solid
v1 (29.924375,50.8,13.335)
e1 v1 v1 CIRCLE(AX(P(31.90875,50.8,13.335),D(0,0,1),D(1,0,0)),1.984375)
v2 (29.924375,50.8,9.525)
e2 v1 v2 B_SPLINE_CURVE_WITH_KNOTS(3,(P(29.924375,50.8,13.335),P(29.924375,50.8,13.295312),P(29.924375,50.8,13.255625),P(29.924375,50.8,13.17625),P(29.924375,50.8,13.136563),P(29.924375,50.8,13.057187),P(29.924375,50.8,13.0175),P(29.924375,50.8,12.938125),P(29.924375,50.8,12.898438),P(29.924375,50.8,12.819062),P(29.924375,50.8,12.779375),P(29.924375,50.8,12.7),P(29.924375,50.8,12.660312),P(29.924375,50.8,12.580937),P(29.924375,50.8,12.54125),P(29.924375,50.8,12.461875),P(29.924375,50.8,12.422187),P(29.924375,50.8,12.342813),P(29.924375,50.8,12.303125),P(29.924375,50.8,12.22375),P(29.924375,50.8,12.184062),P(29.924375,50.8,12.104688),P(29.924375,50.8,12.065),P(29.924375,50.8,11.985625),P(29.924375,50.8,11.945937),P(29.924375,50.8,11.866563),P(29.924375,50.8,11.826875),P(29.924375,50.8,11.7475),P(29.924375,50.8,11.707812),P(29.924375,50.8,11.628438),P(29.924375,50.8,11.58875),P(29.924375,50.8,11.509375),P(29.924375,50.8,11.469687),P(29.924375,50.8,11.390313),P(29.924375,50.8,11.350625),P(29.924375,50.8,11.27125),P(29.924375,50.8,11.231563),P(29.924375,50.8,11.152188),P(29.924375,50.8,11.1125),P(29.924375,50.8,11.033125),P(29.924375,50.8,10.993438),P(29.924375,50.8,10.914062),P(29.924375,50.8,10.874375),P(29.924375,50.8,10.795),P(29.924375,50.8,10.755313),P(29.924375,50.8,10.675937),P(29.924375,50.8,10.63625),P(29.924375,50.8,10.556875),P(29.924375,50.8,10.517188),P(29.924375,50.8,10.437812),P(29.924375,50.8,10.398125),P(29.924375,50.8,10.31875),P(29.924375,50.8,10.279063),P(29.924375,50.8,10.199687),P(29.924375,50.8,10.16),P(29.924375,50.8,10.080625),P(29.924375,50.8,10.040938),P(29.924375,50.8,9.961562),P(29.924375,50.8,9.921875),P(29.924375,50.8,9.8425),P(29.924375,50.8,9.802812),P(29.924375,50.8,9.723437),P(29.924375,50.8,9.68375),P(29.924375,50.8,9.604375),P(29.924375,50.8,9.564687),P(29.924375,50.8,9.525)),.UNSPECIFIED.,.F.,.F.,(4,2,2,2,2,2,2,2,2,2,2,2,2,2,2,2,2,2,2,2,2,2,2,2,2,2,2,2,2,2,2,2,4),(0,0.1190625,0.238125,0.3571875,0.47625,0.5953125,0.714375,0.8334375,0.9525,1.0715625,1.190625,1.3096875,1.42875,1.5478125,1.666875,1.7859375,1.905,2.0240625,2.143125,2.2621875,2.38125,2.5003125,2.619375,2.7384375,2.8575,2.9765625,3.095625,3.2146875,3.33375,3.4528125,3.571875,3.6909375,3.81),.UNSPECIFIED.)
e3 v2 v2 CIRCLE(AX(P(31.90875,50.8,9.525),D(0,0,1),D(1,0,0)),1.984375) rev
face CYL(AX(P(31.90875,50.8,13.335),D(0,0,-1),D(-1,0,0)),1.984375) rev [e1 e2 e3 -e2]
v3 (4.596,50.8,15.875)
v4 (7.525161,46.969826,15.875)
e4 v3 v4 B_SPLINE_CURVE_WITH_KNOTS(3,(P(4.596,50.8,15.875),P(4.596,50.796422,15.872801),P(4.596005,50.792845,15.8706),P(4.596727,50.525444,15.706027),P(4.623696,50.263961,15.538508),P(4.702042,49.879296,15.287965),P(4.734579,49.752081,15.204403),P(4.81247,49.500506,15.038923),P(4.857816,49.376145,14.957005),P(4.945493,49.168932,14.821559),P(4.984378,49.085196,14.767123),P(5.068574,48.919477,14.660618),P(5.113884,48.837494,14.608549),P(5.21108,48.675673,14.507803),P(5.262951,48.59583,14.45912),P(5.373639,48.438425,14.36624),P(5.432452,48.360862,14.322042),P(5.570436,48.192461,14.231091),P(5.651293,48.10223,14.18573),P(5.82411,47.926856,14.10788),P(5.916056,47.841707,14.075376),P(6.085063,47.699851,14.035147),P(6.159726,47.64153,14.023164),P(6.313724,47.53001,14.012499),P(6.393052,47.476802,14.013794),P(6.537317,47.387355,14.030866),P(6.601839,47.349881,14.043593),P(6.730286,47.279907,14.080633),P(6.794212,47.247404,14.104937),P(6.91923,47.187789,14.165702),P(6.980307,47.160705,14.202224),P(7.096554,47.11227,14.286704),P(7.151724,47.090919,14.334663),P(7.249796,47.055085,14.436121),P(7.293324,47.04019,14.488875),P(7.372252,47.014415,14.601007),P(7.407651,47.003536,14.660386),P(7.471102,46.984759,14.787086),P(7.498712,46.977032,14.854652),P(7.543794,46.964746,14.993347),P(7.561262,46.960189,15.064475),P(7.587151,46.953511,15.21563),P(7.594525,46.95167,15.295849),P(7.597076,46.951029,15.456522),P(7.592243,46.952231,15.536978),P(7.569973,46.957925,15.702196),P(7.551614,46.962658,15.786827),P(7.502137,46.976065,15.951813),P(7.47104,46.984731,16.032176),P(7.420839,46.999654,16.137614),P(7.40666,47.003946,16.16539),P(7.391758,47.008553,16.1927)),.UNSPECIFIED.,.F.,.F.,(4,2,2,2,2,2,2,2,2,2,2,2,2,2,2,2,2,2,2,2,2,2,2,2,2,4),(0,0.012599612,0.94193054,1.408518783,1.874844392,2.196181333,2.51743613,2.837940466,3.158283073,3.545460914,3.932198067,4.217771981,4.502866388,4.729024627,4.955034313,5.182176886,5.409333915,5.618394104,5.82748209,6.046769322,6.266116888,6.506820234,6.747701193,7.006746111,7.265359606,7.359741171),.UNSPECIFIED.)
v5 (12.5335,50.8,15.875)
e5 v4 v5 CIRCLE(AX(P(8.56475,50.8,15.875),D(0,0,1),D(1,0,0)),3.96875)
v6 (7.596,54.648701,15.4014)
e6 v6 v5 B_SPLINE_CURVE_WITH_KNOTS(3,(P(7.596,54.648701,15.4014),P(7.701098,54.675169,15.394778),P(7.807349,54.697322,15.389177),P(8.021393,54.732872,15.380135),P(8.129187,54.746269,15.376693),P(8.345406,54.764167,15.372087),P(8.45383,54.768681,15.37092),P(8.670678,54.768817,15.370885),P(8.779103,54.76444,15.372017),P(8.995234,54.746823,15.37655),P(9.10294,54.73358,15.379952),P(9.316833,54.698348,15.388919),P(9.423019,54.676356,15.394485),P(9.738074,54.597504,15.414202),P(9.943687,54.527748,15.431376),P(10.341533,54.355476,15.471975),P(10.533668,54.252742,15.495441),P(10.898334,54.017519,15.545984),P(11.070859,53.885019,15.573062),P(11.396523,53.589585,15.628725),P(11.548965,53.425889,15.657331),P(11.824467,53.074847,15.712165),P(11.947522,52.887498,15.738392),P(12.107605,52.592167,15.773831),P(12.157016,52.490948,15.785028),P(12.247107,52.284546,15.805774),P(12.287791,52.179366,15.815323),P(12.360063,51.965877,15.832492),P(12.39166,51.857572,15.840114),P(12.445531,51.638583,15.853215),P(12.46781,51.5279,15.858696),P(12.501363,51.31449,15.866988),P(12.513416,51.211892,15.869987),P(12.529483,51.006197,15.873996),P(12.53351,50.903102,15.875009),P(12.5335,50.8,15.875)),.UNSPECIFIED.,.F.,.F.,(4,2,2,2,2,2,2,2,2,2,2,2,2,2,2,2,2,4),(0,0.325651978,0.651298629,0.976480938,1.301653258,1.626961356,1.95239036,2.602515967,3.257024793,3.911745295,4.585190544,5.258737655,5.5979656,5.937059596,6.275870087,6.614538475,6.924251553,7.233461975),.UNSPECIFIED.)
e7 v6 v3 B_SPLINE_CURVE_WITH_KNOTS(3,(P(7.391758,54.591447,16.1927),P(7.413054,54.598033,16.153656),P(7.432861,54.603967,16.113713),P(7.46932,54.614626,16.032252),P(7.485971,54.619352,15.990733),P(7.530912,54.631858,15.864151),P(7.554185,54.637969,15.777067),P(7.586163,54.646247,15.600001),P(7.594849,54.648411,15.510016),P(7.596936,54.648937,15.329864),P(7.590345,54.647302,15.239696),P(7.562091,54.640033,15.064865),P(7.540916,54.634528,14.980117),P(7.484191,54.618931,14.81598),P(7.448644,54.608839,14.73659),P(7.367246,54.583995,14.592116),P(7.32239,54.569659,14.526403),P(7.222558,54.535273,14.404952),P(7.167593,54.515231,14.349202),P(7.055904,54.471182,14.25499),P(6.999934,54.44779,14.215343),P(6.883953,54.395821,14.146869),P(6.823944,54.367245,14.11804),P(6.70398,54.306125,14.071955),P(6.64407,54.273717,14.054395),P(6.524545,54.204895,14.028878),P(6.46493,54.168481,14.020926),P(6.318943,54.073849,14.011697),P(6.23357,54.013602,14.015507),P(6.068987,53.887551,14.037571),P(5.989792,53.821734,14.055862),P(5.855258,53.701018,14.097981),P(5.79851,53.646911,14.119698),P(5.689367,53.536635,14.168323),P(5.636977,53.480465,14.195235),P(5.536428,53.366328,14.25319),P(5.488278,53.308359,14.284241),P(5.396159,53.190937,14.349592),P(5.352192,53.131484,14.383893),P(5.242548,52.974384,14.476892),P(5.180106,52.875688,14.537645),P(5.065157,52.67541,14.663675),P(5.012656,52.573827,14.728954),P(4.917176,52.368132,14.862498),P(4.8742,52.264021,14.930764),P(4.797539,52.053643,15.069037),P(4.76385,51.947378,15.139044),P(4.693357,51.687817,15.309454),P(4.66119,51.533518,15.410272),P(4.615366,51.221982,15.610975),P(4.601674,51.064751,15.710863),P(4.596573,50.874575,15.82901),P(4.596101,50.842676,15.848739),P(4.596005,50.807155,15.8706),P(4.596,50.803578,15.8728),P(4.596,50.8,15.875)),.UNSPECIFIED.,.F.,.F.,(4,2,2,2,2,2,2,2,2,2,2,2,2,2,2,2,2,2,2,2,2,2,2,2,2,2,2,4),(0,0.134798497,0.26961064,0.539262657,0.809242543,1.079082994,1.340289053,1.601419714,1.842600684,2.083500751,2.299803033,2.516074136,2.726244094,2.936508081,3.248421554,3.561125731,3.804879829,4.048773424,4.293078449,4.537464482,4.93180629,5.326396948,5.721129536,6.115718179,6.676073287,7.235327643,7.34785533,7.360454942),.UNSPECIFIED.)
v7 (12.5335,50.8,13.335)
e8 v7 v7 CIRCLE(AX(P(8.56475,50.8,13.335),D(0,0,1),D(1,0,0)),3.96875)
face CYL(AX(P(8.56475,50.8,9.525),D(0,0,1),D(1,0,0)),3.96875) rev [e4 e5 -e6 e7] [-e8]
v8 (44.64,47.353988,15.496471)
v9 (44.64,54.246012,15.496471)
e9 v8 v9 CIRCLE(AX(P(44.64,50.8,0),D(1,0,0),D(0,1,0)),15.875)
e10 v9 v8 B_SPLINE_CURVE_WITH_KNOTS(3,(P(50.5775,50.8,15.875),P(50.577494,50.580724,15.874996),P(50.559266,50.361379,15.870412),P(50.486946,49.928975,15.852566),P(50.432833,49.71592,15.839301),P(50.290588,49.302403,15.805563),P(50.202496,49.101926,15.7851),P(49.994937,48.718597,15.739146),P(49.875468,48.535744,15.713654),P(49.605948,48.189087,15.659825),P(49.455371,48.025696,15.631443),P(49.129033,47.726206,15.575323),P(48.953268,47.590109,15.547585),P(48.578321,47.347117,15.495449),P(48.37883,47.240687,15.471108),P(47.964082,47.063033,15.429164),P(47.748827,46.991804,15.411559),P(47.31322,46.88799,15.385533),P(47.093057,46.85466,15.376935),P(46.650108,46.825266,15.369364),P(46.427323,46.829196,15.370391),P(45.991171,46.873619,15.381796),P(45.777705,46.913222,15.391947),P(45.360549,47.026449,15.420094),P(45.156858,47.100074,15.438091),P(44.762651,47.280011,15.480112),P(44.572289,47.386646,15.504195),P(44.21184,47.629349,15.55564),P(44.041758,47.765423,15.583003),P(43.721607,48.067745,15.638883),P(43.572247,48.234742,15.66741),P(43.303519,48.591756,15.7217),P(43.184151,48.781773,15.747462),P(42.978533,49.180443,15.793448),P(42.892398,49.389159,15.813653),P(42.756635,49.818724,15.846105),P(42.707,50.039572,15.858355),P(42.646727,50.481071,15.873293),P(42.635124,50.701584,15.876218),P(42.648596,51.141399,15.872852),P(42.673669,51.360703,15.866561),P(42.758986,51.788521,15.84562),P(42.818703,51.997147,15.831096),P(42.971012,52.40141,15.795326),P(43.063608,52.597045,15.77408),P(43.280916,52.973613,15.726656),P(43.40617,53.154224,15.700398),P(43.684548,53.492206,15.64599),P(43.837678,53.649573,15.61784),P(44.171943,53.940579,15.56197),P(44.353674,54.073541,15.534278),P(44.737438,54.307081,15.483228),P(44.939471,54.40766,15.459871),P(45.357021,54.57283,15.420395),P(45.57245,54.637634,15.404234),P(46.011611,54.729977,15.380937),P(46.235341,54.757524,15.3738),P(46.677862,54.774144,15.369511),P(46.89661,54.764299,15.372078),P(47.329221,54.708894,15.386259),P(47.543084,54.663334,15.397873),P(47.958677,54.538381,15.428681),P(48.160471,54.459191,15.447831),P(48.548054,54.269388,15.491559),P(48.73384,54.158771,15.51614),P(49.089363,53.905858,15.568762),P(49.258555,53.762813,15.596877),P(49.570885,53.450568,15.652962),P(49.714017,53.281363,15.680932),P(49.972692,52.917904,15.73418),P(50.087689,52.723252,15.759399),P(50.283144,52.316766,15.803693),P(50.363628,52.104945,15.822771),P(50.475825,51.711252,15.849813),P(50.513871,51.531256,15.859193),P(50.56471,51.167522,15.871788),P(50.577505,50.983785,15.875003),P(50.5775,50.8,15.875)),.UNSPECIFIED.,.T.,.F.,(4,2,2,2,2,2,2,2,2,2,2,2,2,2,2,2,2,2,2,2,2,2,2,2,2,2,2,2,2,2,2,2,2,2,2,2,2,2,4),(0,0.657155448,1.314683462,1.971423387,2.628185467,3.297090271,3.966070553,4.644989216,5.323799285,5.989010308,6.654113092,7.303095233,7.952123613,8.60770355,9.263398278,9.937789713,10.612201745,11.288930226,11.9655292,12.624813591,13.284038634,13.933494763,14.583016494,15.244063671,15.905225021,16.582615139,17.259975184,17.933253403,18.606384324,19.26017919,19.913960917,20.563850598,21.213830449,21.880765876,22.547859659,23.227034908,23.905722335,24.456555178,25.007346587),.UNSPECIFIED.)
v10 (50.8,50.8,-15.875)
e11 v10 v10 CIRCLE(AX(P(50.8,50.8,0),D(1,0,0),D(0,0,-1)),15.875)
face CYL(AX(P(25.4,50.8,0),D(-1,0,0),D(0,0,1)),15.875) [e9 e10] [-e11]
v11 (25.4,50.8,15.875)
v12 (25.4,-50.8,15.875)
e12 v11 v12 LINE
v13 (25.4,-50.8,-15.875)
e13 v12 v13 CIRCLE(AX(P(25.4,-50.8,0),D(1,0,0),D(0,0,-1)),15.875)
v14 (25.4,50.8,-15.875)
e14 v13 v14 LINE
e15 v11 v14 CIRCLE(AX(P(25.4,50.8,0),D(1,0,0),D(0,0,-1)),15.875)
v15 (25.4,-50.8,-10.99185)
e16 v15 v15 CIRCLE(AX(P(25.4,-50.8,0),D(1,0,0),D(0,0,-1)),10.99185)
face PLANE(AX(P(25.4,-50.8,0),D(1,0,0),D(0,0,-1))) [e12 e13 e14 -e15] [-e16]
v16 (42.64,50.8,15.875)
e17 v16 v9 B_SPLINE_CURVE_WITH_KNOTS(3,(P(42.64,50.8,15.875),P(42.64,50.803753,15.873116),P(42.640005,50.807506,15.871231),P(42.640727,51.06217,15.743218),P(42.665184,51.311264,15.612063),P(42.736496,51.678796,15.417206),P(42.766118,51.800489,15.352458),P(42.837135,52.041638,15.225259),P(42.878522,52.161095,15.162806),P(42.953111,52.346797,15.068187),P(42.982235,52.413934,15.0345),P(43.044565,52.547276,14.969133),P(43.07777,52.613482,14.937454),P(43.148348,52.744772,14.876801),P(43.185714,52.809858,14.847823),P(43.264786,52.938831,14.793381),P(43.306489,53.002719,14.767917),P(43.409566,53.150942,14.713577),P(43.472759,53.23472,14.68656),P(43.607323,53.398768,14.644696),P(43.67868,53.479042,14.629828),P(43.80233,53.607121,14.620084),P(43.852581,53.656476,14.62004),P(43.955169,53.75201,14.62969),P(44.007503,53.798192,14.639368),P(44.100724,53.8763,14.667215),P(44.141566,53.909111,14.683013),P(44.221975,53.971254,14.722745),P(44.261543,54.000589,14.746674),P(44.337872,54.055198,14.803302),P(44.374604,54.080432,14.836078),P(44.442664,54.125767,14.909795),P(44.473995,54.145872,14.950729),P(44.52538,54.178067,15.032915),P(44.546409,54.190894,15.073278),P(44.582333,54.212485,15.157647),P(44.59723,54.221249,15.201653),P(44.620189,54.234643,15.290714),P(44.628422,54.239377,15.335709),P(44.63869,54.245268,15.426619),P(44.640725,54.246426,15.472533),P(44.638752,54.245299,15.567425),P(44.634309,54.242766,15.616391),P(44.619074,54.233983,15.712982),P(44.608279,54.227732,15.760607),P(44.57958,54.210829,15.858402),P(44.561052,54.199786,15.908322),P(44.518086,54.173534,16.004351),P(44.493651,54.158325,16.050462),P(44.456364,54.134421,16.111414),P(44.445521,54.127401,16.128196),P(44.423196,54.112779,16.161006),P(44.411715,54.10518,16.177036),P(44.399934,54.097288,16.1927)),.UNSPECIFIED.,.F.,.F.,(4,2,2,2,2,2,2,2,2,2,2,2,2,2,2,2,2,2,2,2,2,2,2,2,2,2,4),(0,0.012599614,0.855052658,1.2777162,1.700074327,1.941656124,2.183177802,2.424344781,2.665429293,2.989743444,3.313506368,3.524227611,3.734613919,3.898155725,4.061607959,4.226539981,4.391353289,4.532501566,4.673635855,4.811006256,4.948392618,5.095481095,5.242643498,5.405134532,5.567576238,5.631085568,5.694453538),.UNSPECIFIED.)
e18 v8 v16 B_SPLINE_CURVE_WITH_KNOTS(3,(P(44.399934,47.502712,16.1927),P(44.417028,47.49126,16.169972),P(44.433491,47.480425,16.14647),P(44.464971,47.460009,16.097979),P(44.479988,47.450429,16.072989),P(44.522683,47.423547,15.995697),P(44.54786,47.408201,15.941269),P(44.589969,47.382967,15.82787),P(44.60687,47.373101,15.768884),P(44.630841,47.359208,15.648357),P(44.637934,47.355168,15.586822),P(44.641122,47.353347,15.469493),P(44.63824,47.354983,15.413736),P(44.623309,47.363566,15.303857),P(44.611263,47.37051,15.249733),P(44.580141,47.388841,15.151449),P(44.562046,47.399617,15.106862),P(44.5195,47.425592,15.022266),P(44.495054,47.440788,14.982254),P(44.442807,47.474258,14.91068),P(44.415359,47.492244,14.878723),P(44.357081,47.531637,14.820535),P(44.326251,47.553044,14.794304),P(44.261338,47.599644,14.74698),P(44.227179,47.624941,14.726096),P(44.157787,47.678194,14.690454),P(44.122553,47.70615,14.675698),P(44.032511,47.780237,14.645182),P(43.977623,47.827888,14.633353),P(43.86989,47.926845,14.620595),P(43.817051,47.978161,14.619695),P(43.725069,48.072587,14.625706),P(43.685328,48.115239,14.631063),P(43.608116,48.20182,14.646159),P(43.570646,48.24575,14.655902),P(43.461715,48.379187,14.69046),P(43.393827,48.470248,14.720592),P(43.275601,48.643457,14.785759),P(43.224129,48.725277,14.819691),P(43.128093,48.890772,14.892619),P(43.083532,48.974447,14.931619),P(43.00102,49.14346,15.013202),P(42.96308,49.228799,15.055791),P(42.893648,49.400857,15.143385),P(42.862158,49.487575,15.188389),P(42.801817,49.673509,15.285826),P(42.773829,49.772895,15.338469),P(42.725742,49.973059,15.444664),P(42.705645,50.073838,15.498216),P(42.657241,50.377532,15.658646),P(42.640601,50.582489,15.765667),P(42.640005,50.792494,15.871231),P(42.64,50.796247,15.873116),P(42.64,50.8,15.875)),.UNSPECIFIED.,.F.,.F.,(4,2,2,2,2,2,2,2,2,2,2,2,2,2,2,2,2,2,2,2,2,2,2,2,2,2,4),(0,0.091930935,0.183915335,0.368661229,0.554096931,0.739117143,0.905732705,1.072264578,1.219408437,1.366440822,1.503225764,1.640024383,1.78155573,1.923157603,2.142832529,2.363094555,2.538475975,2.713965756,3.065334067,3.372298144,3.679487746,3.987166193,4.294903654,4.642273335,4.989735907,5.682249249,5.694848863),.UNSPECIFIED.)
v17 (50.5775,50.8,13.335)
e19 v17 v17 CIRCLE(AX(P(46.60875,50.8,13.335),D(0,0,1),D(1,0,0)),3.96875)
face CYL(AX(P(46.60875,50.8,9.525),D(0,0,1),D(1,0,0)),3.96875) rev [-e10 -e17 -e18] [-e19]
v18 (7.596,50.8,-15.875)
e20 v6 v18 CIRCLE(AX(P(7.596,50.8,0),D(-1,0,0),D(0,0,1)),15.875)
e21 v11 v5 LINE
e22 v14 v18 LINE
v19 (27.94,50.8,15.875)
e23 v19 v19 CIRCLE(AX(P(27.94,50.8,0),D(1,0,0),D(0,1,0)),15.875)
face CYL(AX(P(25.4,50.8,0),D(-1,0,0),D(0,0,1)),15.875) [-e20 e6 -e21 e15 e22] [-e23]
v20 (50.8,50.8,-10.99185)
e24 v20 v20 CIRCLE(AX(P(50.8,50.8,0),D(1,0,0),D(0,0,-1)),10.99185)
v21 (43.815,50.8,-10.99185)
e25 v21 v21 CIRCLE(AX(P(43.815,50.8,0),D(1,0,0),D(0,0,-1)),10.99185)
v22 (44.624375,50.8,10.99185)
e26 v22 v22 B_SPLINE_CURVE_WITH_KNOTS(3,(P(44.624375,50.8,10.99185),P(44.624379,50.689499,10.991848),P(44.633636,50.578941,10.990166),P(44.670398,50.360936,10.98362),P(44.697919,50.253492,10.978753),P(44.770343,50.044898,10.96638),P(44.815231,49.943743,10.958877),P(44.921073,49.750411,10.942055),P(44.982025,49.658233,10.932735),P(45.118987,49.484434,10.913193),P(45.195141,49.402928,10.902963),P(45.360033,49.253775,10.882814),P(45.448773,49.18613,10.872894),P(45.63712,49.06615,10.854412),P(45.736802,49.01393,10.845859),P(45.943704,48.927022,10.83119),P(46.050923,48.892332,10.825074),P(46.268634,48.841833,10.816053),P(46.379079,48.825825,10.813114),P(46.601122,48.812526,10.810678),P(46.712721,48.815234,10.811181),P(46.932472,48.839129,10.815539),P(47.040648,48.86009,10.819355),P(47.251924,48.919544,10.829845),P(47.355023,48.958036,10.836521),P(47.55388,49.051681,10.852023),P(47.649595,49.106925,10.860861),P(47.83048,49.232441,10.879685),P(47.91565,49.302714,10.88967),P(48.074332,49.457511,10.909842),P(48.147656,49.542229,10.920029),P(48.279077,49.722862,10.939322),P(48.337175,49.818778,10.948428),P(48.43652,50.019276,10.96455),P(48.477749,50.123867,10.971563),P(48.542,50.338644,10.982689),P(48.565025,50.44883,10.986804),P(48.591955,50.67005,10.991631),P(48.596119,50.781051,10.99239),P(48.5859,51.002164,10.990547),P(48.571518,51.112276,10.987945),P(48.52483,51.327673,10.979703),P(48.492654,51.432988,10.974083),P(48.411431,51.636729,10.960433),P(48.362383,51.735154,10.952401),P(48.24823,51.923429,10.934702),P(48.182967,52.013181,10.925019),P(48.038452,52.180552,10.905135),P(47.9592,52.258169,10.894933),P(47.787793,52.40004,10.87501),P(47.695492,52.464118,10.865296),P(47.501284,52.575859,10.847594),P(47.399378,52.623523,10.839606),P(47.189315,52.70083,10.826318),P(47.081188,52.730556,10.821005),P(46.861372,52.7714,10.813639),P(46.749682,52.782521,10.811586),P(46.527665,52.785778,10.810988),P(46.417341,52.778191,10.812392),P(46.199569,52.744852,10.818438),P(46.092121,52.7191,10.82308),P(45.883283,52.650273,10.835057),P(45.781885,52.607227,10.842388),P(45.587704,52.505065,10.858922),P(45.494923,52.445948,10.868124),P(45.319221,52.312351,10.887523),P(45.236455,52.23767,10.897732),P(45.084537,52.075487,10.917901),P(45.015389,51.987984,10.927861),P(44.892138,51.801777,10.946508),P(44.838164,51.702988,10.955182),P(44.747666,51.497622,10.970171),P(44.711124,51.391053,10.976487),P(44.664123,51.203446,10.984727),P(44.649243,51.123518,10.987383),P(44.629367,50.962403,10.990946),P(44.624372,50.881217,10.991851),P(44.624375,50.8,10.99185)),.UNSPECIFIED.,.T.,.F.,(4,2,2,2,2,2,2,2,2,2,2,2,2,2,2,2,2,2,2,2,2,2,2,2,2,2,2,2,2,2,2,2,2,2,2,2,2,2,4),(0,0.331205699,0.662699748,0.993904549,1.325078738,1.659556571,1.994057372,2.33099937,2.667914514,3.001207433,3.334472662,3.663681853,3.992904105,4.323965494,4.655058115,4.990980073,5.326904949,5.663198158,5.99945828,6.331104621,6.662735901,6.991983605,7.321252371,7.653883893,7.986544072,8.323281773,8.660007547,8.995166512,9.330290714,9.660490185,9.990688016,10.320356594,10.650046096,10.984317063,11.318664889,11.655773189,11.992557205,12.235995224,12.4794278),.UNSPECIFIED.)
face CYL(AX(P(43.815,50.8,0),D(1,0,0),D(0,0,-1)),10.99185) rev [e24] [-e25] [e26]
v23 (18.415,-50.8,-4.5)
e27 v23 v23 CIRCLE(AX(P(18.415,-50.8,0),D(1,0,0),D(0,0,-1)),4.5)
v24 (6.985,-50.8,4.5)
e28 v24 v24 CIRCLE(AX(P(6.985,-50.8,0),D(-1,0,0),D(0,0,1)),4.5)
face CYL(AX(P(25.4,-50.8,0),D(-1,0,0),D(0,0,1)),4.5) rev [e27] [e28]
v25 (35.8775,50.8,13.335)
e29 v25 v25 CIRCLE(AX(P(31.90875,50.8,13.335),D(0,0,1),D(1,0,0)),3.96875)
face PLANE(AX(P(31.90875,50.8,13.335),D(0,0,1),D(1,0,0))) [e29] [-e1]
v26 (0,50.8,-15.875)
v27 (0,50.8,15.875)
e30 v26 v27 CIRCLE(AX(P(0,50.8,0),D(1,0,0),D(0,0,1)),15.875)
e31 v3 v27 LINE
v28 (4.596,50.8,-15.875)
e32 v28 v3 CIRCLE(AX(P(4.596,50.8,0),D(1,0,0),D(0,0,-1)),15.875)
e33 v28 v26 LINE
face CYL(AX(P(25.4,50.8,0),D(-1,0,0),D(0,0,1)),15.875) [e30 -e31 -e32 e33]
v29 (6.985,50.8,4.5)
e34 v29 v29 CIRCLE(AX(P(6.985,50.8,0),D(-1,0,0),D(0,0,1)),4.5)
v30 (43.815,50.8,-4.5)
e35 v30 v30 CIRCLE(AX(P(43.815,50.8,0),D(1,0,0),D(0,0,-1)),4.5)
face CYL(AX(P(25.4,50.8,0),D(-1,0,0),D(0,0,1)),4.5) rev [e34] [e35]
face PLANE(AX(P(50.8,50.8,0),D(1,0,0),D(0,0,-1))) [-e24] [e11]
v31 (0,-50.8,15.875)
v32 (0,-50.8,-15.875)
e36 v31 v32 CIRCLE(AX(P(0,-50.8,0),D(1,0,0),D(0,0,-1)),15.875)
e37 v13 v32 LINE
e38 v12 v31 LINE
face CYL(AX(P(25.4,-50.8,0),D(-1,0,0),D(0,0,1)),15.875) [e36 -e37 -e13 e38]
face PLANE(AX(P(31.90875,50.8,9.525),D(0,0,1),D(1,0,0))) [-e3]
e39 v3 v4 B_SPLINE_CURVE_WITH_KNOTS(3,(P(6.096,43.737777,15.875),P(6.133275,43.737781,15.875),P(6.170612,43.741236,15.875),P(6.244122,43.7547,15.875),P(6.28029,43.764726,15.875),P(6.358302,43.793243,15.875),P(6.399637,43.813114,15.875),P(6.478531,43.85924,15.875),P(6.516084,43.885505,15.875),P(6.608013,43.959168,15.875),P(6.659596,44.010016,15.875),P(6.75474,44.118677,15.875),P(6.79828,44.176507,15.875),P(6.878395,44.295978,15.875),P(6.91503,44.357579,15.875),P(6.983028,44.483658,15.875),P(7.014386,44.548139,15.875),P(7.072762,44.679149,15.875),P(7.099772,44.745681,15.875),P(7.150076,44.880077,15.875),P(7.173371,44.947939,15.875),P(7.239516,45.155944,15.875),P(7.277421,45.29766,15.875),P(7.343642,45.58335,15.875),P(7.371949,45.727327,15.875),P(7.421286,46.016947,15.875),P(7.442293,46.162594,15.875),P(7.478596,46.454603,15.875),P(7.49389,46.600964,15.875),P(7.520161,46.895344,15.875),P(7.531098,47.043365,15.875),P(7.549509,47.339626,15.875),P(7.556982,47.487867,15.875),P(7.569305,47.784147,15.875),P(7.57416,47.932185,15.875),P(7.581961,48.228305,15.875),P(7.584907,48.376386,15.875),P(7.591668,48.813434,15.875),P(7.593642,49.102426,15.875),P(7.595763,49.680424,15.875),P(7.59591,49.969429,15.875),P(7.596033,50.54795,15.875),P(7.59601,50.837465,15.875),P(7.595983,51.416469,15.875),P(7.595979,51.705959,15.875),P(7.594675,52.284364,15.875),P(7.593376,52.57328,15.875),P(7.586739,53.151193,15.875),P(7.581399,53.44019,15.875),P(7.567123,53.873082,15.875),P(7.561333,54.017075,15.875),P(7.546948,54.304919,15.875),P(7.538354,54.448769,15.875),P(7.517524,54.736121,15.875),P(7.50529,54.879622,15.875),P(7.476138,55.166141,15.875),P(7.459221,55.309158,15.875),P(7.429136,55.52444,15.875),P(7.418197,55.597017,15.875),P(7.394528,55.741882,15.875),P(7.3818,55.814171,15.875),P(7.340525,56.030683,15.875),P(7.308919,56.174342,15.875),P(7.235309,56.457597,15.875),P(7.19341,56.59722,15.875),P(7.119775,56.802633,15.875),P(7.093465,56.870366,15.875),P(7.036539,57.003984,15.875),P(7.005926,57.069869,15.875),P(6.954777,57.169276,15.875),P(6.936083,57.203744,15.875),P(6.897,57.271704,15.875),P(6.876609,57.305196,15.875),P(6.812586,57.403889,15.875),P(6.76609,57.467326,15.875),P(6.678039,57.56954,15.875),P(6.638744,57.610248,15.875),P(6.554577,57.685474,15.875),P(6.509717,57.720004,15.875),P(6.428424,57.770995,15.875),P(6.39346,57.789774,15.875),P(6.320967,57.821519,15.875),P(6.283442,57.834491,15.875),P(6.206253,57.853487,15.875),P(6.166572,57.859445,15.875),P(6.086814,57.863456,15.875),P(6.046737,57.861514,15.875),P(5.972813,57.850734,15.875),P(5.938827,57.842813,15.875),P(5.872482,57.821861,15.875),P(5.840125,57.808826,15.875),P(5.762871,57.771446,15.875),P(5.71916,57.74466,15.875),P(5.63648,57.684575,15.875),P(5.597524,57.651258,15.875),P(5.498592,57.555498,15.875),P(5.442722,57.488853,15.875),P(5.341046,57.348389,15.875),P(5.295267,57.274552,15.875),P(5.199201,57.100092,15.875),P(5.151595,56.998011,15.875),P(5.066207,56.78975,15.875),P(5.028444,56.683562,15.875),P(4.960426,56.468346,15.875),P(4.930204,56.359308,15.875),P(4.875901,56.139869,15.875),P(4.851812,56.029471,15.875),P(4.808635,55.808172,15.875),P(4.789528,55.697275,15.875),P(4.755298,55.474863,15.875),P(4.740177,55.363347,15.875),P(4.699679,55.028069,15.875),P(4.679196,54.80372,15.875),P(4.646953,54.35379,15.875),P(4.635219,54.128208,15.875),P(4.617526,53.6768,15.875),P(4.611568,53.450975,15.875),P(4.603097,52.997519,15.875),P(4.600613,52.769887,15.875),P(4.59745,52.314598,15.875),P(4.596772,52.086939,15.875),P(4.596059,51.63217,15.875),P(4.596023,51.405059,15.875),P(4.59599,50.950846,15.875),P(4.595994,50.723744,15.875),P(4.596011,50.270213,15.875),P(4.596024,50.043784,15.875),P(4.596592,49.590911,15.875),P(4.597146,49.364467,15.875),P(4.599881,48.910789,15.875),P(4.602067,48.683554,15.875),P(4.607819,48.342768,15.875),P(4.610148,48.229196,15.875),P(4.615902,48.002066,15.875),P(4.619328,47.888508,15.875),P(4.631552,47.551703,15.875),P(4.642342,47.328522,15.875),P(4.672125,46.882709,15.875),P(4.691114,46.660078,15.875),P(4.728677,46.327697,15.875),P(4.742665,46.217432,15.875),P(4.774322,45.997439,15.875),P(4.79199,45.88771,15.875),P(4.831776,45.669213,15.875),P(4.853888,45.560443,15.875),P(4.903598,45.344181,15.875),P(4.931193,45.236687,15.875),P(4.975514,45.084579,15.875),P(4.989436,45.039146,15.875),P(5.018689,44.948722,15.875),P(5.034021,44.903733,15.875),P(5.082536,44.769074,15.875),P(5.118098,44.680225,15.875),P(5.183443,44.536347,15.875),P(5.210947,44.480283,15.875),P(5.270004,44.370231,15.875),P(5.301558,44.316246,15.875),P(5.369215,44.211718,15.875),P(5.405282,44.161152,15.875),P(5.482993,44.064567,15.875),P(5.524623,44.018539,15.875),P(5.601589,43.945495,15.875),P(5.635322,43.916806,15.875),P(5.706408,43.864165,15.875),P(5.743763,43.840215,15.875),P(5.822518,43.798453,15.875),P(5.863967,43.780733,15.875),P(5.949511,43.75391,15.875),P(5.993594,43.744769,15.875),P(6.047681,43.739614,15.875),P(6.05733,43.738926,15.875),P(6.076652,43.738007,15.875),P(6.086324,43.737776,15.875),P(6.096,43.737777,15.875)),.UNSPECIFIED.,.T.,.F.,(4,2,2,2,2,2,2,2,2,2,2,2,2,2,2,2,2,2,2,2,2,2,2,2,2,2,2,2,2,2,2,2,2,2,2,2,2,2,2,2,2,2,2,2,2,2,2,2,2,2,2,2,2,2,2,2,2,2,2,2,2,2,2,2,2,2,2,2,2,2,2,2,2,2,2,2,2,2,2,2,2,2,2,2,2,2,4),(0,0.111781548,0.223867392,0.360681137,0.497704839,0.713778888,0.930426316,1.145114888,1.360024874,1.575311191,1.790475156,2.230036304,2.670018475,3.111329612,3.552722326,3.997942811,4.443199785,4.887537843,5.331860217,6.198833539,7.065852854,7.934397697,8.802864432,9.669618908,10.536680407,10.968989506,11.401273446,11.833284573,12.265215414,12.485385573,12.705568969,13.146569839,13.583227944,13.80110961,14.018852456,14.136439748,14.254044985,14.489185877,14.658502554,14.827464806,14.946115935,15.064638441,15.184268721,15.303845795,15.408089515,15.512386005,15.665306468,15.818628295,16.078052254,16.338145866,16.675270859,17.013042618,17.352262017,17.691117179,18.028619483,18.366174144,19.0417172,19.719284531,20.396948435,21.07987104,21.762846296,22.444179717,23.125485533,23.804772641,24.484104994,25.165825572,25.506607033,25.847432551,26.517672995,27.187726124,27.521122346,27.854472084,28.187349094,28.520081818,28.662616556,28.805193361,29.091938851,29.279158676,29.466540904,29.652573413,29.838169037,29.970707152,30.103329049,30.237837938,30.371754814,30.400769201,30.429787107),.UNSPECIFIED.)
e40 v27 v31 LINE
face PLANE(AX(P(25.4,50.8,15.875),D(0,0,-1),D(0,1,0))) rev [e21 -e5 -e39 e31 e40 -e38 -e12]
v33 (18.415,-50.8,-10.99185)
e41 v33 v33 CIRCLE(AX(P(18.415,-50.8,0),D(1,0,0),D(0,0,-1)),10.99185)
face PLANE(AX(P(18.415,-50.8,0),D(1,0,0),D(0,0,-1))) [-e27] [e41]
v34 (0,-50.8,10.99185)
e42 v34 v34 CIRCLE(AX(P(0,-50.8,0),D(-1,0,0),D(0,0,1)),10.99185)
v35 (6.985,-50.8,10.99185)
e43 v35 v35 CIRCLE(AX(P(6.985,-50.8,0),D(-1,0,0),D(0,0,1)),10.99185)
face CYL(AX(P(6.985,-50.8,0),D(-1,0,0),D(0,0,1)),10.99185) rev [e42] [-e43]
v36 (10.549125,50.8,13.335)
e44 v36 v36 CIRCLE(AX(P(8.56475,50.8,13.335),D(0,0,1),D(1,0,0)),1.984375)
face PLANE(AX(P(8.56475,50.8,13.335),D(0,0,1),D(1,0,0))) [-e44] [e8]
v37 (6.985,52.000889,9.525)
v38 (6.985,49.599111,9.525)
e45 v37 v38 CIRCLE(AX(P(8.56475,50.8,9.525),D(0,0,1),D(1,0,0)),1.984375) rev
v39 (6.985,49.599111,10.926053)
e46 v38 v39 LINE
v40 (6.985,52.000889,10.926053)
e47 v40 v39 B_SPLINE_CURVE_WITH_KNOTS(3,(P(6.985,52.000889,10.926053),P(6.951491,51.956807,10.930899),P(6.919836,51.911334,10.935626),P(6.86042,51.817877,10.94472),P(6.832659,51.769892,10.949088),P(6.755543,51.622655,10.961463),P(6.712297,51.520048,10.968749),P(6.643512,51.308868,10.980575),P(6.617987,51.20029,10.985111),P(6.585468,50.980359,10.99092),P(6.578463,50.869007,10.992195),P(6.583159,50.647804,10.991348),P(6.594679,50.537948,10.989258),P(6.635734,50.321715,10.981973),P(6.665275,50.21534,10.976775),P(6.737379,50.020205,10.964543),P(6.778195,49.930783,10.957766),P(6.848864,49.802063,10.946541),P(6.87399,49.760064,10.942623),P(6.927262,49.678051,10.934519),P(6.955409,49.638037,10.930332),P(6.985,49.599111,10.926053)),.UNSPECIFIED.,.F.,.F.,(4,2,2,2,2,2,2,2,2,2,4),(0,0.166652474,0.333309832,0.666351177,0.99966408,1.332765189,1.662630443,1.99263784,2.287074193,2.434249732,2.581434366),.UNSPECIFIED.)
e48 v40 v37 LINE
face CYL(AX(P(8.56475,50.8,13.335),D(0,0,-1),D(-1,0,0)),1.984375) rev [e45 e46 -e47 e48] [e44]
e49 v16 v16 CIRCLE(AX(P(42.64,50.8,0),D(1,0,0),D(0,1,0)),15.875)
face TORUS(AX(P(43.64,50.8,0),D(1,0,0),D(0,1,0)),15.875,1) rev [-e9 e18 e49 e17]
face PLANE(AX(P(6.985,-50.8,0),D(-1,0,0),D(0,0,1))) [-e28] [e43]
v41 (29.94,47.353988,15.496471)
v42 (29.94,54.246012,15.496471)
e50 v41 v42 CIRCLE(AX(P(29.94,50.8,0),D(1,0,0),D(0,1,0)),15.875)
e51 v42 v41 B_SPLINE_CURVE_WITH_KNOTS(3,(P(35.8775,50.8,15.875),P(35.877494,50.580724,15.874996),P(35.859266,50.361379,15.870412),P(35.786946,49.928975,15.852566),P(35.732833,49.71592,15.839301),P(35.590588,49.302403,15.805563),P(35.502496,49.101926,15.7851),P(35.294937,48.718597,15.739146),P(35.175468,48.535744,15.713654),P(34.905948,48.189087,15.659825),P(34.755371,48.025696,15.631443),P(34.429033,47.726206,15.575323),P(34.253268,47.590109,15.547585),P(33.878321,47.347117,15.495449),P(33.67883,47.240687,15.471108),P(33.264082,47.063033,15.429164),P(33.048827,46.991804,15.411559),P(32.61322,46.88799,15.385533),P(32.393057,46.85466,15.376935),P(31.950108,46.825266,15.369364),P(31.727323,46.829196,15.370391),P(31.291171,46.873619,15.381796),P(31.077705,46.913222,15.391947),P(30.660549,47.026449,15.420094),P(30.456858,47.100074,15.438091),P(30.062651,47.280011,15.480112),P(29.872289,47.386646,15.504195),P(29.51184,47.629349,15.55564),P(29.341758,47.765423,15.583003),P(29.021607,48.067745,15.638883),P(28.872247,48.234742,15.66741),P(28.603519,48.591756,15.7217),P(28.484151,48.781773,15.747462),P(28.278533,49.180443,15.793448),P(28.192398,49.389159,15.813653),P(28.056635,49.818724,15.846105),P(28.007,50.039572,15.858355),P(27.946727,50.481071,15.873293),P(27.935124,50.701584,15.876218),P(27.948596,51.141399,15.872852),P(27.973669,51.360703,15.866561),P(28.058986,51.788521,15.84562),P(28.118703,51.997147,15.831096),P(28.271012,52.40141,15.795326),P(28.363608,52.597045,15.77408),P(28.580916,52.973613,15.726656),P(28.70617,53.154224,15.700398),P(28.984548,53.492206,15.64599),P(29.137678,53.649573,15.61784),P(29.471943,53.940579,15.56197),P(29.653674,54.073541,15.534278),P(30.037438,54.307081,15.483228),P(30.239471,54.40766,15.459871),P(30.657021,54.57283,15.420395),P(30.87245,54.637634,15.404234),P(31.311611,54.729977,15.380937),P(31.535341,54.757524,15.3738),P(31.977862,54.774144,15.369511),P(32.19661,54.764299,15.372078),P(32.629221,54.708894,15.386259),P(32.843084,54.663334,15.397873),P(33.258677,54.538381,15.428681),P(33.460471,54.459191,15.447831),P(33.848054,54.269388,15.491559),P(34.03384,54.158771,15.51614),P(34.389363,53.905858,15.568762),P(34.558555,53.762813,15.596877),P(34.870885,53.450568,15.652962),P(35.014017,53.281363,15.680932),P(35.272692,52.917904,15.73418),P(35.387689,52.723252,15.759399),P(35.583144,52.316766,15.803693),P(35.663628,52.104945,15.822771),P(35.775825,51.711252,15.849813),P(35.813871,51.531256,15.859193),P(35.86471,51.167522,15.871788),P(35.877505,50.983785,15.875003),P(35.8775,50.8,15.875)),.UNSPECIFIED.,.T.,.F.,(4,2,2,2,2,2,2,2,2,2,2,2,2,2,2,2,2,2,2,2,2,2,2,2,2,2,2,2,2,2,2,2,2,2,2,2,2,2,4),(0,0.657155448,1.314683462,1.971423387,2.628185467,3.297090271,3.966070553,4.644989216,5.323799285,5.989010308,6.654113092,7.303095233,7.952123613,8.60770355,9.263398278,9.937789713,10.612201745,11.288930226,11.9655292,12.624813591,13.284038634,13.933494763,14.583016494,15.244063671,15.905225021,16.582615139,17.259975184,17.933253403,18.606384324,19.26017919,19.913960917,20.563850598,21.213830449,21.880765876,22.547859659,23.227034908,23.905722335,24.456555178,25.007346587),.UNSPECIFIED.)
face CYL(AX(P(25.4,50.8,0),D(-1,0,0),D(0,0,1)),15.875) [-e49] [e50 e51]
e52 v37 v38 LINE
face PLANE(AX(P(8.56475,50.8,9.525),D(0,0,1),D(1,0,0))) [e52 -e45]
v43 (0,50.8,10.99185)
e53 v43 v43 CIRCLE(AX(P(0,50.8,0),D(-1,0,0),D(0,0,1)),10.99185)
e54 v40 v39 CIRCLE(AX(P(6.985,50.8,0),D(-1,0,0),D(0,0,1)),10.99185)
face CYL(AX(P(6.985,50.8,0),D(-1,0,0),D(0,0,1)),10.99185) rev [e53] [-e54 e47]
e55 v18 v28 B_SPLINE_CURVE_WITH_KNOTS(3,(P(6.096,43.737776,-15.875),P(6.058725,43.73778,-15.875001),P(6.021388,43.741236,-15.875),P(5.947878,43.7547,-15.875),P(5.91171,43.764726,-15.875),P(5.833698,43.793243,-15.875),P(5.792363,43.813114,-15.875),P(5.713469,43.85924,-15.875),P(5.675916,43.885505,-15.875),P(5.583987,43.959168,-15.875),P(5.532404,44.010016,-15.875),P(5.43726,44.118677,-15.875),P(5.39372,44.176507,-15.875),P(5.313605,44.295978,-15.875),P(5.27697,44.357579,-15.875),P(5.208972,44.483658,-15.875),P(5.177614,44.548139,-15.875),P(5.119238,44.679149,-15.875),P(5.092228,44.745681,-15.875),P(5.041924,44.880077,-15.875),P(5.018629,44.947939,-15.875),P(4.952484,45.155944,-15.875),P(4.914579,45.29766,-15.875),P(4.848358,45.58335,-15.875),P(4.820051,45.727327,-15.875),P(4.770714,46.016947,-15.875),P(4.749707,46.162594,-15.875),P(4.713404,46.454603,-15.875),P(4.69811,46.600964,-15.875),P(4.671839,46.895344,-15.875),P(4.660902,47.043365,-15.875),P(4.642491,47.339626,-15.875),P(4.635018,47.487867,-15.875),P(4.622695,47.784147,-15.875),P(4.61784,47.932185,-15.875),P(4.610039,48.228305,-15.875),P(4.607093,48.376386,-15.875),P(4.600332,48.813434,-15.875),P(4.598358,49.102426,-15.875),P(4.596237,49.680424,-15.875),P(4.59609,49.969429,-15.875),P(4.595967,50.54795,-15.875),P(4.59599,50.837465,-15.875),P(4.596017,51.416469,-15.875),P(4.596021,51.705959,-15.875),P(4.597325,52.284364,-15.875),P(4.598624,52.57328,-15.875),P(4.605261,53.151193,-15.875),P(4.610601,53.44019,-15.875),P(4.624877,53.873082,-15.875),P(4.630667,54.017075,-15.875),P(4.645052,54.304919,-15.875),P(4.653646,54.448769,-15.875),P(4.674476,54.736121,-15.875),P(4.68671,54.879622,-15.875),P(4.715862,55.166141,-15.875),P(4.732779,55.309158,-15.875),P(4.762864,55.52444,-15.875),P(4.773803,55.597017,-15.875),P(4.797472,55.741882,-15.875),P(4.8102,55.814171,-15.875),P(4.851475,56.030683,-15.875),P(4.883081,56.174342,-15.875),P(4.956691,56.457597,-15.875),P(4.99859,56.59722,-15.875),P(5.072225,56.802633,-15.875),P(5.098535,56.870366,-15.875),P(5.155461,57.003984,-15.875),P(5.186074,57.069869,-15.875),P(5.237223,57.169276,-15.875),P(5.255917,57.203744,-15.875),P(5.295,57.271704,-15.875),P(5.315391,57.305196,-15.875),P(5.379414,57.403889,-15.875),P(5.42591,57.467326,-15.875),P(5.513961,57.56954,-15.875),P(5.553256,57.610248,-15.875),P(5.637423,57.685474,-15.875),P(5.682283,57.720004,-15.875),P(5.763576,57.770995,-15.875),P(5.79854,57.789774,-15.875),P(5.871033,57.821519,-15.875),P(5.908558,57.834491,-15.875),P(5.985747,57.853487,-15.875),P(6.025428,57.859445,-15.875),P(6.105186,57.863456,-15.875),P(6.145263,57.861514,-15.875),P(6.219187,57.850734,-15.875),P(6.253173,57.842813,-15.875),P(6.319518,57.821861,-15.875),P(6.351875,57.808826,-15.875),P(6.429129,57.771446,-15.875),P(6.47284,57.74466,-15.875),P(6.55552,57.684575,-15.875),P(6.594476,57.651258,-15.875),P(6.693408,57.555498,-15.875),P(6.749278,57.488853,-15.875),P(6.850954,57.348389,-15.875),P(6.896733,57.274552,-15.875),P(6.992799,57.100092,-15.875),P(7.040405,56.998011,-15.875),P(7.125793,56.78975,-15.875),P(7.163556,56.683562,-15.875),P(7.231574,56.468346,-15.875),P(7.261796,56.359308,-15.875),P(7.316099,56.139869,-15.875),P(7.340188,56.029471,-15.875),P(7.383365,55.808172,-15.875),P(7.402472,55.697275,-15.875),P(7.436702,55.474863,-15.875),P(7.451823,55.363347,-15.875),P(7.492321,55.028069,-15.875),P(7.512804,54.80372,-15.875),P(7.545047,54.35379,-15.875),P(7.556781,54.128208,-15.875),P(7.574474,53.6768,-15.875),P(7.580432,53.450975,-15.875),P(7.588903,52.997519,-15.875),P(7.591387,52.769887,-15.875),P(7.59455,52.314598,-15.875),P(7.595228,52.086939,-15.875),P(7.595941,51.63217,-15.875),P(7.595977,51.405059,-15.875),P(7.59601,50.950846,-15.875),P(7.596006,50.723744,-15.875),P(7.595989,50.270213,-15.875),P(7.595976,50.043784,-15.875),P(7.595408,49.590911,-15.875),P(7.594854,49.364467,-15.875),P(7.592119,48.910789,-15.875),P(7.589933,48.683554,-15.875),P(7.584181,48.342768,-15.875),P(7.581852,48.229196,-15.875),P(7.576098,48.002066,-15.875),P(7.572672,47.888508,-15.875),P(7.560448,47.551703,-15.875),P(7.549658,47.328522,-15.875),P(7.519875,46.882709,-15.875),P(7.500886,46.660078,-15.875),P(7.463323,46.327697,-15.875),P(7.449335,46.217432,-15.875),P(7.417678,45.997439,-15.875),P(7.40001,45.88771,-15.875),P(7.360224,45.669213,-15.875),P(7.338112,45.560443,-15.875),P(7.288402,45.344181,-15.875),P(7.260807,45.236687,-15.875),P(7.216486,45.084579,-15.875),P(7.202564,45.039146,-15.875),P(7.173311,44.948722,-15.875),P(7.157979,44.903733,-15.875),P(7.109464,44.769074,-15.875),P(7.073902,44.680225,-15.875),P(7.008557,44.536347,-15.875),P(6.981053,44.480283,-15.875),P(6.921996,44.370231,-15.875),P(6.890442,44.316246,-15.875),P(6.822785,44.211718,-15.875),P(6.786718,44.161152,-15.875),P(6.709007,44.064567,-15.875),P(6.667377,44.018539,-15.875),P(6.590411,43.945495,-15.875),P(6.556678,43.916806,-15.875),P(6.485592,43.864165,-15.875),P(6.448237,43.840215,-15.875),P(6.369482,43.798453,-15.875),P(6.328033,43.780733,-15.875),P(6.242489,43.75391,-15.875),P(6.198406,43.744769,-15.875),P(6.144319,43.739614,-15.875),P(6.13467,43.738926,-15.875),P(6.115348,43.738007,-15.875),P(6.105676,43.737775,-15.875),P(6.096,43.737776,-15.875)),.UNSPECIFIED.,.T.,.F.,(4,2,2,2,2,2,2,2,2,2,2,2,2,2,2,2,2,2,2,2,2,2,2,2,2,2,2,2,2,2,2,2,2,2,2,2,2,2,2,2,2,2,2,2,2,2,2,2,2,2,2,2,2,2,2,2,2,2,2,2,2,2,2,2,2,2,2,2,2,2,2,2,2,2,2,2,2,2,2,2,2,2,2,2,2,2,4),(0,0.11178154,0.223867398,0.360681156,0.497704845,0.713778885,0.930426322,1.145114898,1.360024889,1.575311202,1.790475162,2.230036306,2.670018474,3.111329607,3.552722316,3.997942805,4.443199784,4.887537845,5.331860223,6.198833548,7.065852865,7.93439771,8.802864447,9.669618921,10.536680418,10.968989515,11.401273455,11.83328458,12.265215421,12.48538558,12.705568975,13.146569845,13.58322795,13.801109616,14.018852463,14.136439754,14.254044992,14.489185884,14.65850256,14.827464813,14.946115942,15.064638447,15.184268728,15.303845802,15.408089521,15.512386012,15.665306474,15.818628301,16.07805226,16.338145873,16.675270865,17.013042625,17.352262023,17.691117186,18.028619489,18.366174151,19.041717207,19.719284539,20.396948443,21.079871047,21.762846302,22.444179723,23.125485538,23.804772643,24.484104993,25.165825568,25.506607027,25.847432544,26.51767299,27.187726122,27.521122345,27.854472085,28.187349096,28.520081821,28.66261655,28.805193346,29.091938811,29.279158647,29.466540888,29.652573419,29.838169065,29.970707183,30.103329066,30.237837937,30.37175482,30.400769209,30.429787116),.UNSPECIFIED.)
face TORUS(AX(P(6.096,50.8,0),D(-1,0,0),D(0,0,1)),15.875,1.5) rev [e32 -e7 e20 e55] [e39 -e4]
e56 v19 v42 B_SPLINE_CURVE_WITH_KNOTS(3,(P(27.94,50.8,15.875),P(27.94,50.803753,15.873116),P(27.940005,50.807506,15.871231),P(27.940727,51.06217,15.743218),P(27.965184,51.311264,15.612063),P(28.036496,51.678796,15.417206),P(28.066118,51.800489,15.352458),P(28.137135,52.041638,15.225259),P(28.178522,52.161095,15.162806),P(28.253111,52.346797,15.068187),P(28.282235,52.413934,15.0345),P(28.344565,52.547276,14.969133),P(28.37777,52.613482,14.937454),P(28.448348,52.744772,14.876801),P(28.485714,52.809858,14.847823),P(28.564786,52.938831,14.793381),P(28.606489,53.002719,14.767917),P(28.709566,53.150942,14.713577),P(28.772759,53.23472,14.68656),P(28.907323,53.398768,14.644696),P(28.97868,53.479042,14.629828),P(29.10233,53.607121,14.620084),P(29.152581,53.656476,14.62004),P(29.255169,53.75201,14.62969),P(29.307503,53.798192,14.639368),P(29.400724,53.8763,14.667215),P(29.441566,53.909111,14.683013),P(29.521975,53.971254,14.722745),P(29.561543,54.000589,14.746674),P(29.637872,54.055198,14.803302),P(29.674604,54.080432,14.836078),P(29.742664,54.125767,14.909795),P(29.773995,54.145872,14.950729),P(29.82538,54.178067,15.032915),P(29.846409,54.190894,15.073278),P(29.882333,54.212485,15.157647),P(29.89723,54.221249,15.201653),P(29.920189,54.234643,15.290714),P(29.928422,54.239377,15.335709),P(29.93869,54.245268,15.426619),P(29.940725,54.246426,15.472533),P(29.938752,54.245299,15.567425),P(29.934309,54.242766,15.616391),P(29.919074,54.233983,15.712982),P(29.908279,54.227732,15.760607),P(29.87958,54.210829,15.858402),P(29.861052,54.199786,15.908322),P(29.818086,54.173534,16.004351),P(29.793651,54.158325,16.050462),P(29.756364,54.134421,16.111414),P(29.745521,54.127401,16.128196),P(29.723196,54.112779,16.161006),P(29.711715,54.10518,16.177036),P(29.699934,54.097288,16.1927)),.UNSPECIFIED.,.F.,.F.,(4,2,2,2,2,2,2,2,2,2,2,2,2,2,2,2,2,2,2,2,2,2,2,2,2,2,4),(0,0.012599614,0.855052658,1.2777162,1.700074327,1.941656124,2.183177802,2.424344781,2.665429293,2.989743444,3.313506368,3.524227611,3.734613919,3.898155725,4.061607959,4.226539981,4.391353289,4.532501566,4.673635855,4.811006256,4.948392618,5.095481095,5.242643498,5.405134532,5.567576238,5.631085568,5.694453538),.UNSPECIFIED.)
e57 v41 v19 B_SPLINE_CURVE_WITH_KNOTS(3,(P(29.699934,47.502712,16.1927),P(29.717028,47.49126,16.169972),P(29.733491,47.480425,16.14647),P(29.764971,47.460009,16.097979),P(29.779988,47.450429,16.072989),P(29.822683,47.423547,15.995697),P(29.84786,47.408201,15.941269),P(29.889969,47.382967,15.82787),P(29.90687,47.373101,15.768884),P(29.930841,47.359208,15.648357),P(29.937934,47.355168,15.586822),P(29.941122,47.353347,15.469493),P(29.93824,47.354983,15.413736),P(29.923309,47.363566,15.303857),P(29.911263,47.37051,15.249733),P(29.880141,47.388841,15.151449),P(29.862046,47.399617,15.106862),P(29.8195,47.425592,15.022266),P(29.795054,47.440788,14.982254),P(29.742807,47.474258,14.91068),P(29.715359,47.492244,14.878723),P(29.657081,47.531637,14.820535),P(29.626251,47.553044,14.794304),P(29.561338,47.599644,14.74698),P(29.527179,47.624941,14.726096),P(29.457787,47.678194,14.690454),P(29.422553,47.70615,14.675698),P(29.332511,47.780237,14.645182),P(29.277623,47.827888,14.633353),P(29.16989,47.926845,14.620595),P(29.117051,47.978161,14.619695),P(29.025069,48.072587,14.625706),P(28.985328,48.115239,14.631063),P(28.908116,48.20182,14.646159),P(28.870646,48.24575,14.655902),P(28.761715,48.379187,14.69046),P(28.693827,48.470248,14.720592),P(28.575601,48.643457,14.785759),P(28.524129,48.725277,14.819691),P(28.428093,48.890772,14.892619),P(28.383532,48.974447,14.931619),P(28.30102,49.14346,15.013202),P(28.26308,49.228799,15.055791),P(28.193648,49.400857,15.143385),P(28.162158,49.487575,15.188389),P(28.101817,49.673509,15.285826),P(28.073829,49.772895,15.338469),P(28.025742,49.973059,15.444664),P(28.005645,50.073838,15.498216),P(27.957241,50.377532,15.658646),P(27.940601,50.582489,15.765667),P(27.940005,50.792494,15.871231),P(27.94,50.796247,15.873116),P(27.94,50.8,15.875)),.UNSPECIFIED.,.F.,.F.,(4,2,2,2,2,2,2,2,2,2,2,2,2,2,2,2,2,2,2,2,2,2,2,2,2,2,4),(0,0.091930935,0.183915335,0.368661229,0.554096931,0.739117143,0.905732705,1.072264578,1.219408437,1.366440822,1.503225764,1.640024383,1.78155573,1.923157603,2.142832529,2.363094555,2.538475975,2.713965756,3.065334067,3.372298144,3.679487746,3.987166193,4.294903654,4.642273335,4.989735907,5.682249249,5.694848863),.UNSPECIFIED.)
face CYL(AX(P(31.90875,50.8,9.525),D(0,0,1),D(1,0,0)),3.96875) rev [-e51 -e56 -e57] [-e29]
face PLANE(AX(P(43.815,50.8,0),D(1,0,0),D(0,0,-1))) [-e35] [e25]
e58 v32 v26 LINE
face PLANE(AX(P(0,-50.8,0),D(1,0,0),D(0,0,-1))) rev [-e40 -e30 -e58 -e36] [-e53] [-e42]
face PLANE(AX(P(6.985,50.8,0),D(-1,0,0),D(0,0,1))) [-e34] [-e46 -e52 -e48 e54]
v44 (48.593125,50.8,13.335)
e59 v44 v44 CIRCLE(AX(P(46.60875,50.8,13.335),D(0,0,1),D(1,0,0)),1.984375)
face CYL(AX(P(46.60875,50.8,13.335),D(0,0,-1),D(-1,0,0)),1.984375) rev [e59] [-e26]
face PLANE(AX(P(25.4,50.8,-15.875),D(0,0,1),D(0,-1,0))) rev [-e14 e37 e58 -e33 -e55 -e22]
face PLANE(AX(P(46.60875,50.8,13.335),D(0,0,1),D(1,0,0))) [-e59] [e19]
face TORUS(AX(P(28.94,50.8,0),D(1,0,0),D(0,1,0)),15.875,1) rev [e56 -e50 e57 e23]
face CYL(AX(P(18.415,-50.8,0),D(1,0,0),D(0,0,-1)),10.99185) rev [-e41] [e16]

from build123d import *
from build123d.topology import SkipClean

# Parameters (mm, degrees)
SKETCH1_R           = 4.5
BOSS_EXTRUDE1_DEPTH = 25.4
SKETCH2_R           = 15.875
SKETCH2_R_2         = 4.5
BOSS_EXTRUDE2_DEPTH = 25.4
SKETCH5_R           = 3.96875
CUT_EXTRUDE1_DEPTH  = 6.35
BOSS_EXTRUDE3_START = 3.81
SKETCH7_R           = 3.96875
SKETCH7_R_2         = 1.984375
BOSS_EXTRUDE3_DEPTH = 3.81
SKETCH14_R          = 10.99185
CUT_EXTRUDE4_DEPTH  = 6.985
SKETCH16_R          = 10.99185
CUT_EXTRUDE5_DEPTH  = 6.985
SKETCH19_R          = 1.5
SKETCH20_R          = 3.96875
CUT_EXTRUDE6_DEPTH  = 6.35
BOSS_EXTRUDE4_START = 3.81
SKETCH21_R          = 3.96875
SKETCH21_R_2        = 1.984375
BOSS_EXTRUDE4_DEPTH = 3.81
CUT_EXTRUDE2_START  = -6.985
SKETCH12_R          = 10.99185
CUT_EXTRUDE2_DEPTH  = 6.985


with BuildPart() as part:
    # Sketch1 → Boss-Extrude1 (new body)
    with BuildSketch(Plane(origin=(0, 0, 0), x_dir=(0, 0, -1), z_dir=(1, 0, 0))):
        with BuildLine():
            Line((15.875, 50.8), (15.875, -50.8))
            ThreePointArc((15.875, -50.8), (0, -66.675), (-15.875, -50.8))
            Line((-15.875, -50.8), (-15.875, 50.8))
            ThreePointArc((-15.875, 50.8), (0, 66.675), (15.875, 50.8))
        make_face()
        with Locations((0, -50.8)):
            Circle(SKETCH1_R, mode=Mode.SUBTRACT)
        with Locations((0, 50.8)):
            Circle(SKETCH1_R, mode=Mode.SUBTRACT)
    extrude(amount=BOSS_EXTRUDE1_DEPTH)

    # Sketch2 → Boss-Extrude2 (add)
    with SkipClean():  # the faces are left unmerged after this step: merging them gives an invalid solid
        with BuildSketch(Plane(origin=(25.4, 0, 0), x_dir=(0, 0, -1), z_dir=(1, 0, 0))):
            with Locations((0, 50.8)):
                Circle(SKETCH2_R)
            with Locations((0, 50.8)):
                Circle(SKETCH2_R_2, mode=Mode.SUBTRACT)
        extrude(amount=BOSS_EXTRUDE2_DEPTH)
    add(part.part.scale(1), mode=Mode.REPLACE)  # the faces are merged on a copy

    # Sketch3 → Cut-Revolve1 (revolve, cut)
    with BuildSketch(Plane.XY):
        with BuildLine():
            Line((27.94, 66.675), (29.94, 66.675))
            ThreePointArc((29.94, 66.675), (28.94, 65.675), (27.94, 66.675))
        make_face()
        with BuildLine():
            Line((42.64, 66.675), (44.64, 66.675))
            ThreePointArc((44.64, 66.675), (43.64, 65.675), (42.64, 66.675))
        make_face()
    revolve(axis=Axis((45.661298308, 50.8, 0), (-1, 0, 0)), mode=Mode.SUBTRACT)

    # Sketch5 → Cut-Extrude1 (cut)
    with BuildSketch(Plane.XY.offset(15.875)):
        with Locations((31.90875, 50.8)):
            Circle(SKETCH5_R)
        with Locations((46.60875, 50.8)):
            Circle(SKETCH5_R)
    extrude(amount=-CUT_EXTRUDE1_DEPTH, mode=Mode.SUBTRACT)

    # Sketch7 → Boss-Extrude3 (add)
    # profile 1 of 2: a face of its own
    with BuildSketch(Plane.XY.offset(9.525).offset(BOSS_EXTRUDE3_START)):
        with Locations((31.90875, 50.8)):
            Circle(SKETCH7_R)
        with Locations((31.90875, 50.8)):
            Circle(SKETCH7_R_2, mode=Mode.SUBTRACT)
    # profile 2 of 2: a face of its own
    with BuildSketch(Plane.XY.offset(9.525).offset(BOSS_EXTRUDE3_START)):
        with Locations((46.60875, 50.8)):
            Circle(SKETCH7_R)
        with Locations((46.60875, 50.8)):
            Circle(SKETCH7_R_2, mode=Mode.SUBTRACT)
    extrude(amount=-BOSS_EXTRUDE3_DEPTH)

    # Sketch14 → Cut-Extrude4 (cut)
    with BuildSketch(Plane(origin=(25.4, 0, 0), x_dir=(0, 0, -1), z_dir=(1, 0, 0))):
        with Locations((0, -50.8)):
            Circle(SKETCH14_R)
    extrude(amount=-CUT_EXTRUDE4_DEPTH, mode=Mode.SUBTRACT)

    # Sketch16 → Cut-Extrude5 (cut)
    with BuildSketch(Plane(origin=(50.8, 0, 0), x_dir=(0, 0, -1), z_dir=(1, 0, 0))):
        with Locations((0, 50.8)):
            Circle(SKETCH16_R)
    extrude(amount=-CUT_EXTRUDE5_DEPTH, mode=Mode.SUBTRACT)

    # Sketch19 → Cut-Revolve2 (revolve, cut)
    with BuildSketch(Plane.XY):
        with Locations((6.096, 66.675)):
            Circle(SKETCH19_R)
    revolve(axis=Axis((0, 50.8, 0), (1, 0, 0)), mode=Mode.SUBTRACT)

    # Sketch20 → Cut-Extrude6 (cut)
    with BuildSketch(Plane.XY.offset(15.875)):
        with Locations((8.56475, 50.8)):
            Circle(SKETCH20_R)
    extrude(amount=-CUT_EXTRUDE6_DEPTH, mode=Mode.SUBTRACT)

    # Sketch21 → Boss-Extrude4 (add)
    with BuildSketch(Plane.XY.offset(9.525).offset(BOSS_EXTRUDE4_START)):
        with Locations((8.56475, 50.8)):
            Circle(SKETCH21_R)
        with Locations((8.56475, 50.8)):
            Circle(SKETCH21_R_2, mode=Mode.SUBTRACT)
    extrude(amount=-BOSS_EXTRUDE4_DEPTH)

    # Sketch12 → Cut-Extrude2 (cut)
    with BuildSketch(Plane.ZY.offset(CUT_EXTRUDE2_START)):
        with Locations((0, 50.8)):
            Circle(SKETCH12_R)
        with Locations((0, -50.8)):
            Circle(SKETCH12_R)
    extrude(amount=CUT_EXTRUDE2_DEPTH, mode=Mode.SUBTRACT)


solid = part.part
